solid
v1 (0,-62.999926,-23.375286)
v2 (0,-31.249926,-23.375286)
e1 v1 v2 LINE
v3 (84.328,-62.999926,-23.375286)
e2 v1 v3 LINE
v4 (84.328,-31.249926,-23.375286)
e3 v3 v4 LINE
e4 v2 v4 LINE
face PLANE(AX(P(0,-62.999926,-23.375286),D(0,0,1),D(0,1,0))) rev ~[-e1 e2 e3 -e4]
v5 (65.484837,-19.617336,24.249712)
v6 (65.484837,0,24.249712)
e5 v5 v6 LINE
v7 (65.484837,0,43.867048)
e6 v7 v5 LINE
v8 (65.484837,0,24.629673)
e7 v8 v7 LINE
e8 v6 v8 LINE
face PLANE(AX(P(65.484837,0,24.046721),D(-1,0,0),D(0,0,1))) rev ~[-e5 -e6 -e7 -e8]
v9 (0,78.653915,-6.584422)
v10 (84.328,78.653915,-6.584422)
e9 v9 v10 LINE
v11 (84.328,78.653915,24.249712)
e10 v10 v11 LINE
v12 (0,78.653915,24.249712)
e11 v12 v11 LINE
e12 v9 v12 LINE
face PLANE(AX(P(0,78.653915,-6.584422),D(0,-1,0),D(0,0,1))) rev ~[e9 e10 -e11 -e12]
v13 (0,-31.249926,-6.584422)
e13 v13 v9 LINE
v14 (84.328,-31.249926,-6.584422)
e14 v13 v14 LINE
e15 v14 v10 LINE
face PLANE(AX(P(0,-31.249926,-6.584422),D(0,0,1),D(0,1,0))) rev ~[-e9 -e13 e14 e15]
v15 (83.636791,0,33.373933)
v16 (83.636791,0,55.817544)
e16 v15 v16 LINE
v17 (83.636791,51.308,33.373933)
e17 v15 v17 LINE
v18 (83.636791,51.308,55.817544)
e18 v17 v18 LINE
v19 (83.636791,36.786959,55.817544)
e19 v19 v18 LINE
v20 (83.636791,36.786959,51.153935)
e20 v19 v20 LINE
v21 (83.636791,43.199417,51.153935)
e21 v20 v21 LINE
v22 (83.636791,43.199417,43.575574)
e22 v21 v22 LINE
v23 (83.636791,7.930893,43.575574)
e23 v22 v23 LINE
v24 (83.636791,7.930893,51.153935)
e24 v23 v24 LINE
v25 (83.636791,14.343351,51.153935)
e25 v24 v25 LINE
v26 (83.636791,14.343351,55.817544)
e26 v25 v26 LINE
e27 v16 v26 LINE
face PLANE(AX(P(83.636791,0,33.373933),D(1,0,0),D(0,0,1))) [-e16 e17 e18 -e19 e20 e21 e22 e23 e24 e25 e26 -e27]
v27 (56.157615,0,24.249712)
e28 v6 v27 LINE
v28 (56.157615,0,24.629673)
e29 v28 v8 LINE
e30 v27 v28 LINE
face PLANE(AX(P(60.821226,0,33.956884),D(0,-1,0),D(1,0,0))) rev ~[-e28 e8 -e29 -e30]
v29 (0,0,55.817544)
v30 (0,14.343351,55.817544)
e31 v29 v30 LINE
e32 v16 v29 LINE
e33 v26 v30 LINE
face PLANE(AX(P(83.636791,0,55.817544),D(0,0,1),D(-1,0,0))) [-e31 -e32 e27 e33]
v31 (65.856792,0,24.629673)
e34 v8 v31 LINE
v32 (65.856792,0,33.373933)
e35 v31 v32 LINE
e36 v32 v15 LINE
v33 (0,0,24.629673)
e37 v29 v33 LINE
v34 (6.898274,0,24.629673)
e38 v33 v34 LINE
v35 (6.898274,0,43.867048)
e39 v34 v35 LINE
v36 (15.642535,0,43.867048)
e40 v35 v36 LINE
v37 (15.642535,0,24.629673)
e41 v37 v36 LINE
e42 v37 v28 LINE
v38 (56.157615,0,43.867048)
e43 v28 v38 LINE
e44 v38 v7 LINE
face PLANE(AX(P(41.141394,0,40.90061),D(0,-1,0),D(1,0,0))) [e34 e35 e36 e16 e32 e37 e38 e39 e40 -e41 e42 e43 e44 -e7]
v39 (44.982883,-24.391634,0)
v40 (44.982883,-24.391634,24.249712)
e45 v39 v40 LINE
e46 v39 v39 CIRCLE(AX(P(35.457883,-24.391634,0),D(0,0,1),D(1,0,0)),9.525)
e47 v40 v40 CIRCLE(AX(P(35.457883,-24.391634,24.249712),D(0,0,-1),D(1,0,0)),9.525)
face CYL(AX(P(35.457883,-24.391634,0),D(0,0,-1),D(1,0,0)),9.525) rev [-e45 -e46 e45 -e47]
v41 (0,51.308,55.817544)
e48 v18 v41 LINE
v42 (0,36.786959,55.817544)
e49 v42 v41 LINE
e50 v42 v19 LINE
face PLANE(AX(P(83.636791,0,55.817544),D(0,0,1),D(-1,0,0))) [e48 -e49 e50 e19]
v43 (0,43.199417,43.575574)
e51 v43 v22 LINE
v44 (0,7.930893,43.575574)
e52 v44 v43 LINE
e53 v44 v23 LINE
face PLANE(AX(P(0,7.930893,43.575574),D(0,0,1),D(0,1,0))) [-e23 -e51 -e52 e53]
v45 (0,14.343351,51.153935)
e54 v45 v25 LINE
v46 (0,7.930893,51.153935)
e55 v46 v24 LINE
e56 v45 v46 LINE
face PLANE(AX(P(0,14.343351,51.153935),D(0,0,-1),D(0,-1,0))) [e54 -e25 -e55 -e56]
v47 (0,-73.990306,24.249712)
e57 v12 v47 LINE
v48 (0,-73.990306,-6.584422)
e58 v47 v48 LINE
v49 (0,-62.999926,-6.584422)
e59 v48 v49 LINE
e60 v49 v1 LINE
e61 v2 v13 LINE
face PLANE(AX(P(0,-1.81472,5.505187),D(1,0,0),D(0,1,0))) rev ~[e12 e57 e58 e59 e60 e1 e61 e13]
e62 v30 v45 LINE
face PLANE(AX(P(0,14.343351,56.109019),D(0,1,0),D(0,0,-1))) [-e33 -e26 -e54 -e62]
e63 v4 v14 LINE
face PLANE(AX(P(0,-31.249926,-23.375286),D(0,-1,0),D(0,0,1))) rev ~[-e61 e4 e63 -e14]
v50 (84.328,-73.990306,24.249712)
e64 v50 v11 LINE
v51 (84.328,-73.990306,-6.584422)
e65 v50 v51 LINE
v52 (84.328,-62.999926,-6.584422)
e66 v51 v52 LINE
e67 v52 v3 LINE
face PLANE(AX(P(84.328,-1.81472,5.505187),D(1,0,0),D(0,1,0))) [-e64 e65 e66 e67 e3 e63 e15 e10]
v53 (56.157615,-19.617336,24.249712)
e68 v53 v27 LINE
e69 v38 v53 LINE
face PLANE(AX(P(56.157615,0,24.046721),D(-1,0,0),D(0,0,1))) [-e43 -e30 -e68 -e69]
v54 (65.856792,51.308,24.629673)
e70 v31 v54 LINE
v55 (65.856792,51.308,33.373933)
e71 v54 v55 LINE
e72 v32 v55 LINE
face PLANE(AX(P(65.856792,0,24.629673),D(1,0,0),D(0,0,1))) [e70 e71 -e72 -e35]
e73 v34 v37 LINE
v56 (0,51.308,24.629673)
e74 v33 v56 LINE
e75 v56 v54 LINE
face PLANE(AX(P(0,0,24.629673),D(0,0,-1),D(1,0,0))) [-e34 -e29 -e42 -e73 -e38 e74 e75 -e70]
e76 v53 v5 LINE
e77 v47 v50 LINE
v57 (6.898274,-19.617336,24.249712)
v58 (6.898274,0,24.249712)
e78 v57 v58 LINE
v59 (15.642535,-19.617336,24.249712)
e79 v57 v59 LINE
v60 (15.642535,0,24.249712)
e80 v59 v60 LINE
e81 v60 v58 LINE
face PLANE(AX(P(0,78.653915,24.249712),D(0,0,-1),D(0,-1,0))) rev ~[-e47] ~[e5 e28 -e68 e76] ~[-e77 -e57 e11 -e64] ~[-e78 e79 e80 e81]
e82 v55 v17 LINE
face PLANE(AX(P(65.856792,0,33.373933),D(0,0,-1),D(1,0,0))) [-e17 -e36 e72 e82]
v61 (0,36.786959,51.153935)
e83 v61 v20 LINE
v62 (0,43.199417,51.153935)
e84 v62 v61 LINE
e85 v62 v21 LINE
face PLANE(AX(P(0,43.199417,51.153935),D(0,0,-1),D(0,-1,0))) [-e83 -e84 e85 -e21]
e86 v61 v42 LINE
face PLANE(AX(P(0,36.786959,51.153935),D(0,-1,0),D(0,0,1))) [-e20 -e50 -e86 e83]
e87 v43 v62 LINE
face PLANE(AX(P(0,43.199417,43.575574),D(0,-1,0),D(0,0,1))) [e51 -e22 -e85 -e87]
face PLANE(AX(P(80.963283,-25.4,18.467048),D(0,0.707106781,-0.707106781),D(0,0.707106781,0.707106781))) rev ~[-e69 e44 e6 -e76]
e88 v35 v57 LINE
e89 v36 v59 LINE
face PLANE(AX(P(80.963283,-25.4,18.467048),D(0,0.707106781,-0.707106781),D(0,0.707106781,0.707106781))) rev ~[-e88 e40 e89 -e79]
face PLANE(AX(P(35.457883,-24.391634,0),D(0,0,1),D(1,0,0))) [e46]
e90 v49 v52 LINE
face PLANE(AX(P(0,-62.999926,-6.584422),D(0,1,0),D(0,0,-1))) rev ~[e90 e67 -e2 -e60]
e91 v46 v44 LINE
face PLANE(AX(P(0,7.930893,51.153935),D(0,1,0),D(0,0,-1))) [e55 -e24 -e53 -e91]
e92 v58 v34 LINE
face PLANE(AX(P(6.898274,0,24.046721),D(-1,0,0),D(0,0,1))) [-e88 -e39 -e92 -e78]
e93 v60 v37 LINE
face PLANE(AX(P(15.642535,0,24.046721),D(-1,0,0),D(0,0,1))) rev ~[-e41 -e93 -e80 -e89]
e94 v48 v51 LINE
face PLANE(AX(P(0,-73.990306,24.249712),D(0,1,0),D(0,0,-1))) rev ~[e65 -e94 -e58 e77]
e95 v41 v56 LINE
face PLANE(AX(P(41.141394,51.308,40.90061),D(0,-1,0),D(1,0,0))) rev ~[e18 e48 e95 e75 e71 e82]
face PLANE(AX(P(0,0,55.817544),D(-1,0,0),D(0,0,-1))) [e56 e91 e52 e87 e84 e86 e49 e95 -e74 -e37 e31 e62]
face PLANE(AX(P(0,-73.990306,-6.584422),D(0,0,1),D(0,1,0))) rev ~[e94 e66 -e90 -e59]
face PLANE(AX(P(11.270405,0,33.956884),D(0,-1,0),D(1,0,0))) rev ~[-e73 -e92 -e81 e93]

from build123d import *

# Parameters (mm, degrees)
F1_DEPTH    = 84.328
F2_W        = 8.7442607619
F2_H        = 19.8203269392
F2_W_2      = 9.3272216618
F3_DEPTH    = 25.4
F4_T4_DEPTH = 139.3857565506
F4_T9_DEPTH = 139.9687174505
F5_R        = 9.525
F6_DEPTH    = 36.83
F8_DEPTH    = 51.308
F10_DEPTH   = 88.9


# Not quite as in the source:
# - a fillet or chamfer that OpenCascade refuses, or shapes differently, is made with other operations: its cross-section is extruded or revolved along the edge and cut away or added


with BuildPart() as f1:
    # F0 (on Right) → F1 (new body)
    with BuildSketch(Plane.YZ):
        Polygon((78.6539154417, 24.2497121325), (-73.9903064734, 24.2497121325), (-73.9903064734, -6.584421545), (-62.9999262101, -6.584421545), (-62.9999262101, -23.3752859166), (-31.2499262101, -23.3752859166), (-31.2499262101, -6.584421545), (78.6539154417, -6.584421545), align=None)
    extrude(amount=F1_DEPTH)

    # F2 (on Front) → F3 (join)
    with BuildSketch(Plane.XZ):
        with Locations((11.2704045605, 33.9568844065)):
            Rectangle(F2_W, F2_H)
        with Locations((60.8212258667, 33.9568844065)):
            Rectangle(F2_W_2, F2_H)
    extrude(amount=F3_DEPTH)

    # F4: chamfer of 25.4 on 2 edges, made by hand


with BuildPart() as f4_tool2:
    # F4_s3 → F4_t4 (new body)
    with BuildSketch(Plane.YZ.offset(80.9632828358)):
        Polygon((-25.4, 18.4670478761), (0, 43.8670478761), (-25.4, 43.8670478761), align=None)
    extrude(amount=-F4_T4_DEPTH)

    split(bisect_by=Plane.XY.offset(24.2497121325), keep=Keep.TOP)


with BuildPart() as f1_1:
    add(f1.part)

    # F4_t1: cut F4_tool2
    add(f4_tool2.part, mode=Mode.SUBTRACT)


with BuildPart() as f4_tool7:
    # F4_s8 → F4_t9 (new body)
    with BuildSketch(Plane.YZ.offset(130.8055845919)):
        Polygon((-25.4, 18.4670478761), (0, 43.8670478761), (-25.4, 43.8670478761), align=None)
    extrude(amount=-F4_T9_DEPTH)

    split(bisect_by=Plane.XY.offset(24.2497121325), keep=Keep.TOP)


with BuildPart() as f1_2:
    add(f1_1.part)

    # F4_t6: cut F4_tool7
    add(f4_tool7.part, mode=Mode.SUBTRACT)

    # F5 (on Top) → F6 (cut)
    with BuildSketch(Plane.XY):
        with Locations((35.4578830302, -24.3916343898)):
            Circle(F5_R)
    extrude(amount=F6_DEPTH, mode=Mode.SUBTRACT)

    # F7 (on Front) → F8 (join)
    with BuildSketch(Plane.XZ):
        Polygon((65.8567920327, 24.6296729892), (65.8567920327, 33.3739332855), (83.636790514, 33.3739332855), (83.636790514, 55.8175444603), (0, 55.8175444603), (0, 24.6296729892), align=None)
    extrude(amount=-F8_DEPTH)

    # F9 (on Right) → F10 (cut)
    with BuildSketch(Plane.YZ):
        Polygon((36.7869585752, 56.1090186238), (14.3433511257, 56.1090186238), (14.3433511257, 51.153935492), (7.930893451, 51.153935492), (7.930893451, 43.5755737126), (43.1994171752, 43.5755737126), (43.1994171752, 51.153935492), (36.7869585752, 51.153935492), align=None)
    extrude(amount=F10_DEPTH, mode=Mode.SUBTRACT)


solid = f1_2.part
